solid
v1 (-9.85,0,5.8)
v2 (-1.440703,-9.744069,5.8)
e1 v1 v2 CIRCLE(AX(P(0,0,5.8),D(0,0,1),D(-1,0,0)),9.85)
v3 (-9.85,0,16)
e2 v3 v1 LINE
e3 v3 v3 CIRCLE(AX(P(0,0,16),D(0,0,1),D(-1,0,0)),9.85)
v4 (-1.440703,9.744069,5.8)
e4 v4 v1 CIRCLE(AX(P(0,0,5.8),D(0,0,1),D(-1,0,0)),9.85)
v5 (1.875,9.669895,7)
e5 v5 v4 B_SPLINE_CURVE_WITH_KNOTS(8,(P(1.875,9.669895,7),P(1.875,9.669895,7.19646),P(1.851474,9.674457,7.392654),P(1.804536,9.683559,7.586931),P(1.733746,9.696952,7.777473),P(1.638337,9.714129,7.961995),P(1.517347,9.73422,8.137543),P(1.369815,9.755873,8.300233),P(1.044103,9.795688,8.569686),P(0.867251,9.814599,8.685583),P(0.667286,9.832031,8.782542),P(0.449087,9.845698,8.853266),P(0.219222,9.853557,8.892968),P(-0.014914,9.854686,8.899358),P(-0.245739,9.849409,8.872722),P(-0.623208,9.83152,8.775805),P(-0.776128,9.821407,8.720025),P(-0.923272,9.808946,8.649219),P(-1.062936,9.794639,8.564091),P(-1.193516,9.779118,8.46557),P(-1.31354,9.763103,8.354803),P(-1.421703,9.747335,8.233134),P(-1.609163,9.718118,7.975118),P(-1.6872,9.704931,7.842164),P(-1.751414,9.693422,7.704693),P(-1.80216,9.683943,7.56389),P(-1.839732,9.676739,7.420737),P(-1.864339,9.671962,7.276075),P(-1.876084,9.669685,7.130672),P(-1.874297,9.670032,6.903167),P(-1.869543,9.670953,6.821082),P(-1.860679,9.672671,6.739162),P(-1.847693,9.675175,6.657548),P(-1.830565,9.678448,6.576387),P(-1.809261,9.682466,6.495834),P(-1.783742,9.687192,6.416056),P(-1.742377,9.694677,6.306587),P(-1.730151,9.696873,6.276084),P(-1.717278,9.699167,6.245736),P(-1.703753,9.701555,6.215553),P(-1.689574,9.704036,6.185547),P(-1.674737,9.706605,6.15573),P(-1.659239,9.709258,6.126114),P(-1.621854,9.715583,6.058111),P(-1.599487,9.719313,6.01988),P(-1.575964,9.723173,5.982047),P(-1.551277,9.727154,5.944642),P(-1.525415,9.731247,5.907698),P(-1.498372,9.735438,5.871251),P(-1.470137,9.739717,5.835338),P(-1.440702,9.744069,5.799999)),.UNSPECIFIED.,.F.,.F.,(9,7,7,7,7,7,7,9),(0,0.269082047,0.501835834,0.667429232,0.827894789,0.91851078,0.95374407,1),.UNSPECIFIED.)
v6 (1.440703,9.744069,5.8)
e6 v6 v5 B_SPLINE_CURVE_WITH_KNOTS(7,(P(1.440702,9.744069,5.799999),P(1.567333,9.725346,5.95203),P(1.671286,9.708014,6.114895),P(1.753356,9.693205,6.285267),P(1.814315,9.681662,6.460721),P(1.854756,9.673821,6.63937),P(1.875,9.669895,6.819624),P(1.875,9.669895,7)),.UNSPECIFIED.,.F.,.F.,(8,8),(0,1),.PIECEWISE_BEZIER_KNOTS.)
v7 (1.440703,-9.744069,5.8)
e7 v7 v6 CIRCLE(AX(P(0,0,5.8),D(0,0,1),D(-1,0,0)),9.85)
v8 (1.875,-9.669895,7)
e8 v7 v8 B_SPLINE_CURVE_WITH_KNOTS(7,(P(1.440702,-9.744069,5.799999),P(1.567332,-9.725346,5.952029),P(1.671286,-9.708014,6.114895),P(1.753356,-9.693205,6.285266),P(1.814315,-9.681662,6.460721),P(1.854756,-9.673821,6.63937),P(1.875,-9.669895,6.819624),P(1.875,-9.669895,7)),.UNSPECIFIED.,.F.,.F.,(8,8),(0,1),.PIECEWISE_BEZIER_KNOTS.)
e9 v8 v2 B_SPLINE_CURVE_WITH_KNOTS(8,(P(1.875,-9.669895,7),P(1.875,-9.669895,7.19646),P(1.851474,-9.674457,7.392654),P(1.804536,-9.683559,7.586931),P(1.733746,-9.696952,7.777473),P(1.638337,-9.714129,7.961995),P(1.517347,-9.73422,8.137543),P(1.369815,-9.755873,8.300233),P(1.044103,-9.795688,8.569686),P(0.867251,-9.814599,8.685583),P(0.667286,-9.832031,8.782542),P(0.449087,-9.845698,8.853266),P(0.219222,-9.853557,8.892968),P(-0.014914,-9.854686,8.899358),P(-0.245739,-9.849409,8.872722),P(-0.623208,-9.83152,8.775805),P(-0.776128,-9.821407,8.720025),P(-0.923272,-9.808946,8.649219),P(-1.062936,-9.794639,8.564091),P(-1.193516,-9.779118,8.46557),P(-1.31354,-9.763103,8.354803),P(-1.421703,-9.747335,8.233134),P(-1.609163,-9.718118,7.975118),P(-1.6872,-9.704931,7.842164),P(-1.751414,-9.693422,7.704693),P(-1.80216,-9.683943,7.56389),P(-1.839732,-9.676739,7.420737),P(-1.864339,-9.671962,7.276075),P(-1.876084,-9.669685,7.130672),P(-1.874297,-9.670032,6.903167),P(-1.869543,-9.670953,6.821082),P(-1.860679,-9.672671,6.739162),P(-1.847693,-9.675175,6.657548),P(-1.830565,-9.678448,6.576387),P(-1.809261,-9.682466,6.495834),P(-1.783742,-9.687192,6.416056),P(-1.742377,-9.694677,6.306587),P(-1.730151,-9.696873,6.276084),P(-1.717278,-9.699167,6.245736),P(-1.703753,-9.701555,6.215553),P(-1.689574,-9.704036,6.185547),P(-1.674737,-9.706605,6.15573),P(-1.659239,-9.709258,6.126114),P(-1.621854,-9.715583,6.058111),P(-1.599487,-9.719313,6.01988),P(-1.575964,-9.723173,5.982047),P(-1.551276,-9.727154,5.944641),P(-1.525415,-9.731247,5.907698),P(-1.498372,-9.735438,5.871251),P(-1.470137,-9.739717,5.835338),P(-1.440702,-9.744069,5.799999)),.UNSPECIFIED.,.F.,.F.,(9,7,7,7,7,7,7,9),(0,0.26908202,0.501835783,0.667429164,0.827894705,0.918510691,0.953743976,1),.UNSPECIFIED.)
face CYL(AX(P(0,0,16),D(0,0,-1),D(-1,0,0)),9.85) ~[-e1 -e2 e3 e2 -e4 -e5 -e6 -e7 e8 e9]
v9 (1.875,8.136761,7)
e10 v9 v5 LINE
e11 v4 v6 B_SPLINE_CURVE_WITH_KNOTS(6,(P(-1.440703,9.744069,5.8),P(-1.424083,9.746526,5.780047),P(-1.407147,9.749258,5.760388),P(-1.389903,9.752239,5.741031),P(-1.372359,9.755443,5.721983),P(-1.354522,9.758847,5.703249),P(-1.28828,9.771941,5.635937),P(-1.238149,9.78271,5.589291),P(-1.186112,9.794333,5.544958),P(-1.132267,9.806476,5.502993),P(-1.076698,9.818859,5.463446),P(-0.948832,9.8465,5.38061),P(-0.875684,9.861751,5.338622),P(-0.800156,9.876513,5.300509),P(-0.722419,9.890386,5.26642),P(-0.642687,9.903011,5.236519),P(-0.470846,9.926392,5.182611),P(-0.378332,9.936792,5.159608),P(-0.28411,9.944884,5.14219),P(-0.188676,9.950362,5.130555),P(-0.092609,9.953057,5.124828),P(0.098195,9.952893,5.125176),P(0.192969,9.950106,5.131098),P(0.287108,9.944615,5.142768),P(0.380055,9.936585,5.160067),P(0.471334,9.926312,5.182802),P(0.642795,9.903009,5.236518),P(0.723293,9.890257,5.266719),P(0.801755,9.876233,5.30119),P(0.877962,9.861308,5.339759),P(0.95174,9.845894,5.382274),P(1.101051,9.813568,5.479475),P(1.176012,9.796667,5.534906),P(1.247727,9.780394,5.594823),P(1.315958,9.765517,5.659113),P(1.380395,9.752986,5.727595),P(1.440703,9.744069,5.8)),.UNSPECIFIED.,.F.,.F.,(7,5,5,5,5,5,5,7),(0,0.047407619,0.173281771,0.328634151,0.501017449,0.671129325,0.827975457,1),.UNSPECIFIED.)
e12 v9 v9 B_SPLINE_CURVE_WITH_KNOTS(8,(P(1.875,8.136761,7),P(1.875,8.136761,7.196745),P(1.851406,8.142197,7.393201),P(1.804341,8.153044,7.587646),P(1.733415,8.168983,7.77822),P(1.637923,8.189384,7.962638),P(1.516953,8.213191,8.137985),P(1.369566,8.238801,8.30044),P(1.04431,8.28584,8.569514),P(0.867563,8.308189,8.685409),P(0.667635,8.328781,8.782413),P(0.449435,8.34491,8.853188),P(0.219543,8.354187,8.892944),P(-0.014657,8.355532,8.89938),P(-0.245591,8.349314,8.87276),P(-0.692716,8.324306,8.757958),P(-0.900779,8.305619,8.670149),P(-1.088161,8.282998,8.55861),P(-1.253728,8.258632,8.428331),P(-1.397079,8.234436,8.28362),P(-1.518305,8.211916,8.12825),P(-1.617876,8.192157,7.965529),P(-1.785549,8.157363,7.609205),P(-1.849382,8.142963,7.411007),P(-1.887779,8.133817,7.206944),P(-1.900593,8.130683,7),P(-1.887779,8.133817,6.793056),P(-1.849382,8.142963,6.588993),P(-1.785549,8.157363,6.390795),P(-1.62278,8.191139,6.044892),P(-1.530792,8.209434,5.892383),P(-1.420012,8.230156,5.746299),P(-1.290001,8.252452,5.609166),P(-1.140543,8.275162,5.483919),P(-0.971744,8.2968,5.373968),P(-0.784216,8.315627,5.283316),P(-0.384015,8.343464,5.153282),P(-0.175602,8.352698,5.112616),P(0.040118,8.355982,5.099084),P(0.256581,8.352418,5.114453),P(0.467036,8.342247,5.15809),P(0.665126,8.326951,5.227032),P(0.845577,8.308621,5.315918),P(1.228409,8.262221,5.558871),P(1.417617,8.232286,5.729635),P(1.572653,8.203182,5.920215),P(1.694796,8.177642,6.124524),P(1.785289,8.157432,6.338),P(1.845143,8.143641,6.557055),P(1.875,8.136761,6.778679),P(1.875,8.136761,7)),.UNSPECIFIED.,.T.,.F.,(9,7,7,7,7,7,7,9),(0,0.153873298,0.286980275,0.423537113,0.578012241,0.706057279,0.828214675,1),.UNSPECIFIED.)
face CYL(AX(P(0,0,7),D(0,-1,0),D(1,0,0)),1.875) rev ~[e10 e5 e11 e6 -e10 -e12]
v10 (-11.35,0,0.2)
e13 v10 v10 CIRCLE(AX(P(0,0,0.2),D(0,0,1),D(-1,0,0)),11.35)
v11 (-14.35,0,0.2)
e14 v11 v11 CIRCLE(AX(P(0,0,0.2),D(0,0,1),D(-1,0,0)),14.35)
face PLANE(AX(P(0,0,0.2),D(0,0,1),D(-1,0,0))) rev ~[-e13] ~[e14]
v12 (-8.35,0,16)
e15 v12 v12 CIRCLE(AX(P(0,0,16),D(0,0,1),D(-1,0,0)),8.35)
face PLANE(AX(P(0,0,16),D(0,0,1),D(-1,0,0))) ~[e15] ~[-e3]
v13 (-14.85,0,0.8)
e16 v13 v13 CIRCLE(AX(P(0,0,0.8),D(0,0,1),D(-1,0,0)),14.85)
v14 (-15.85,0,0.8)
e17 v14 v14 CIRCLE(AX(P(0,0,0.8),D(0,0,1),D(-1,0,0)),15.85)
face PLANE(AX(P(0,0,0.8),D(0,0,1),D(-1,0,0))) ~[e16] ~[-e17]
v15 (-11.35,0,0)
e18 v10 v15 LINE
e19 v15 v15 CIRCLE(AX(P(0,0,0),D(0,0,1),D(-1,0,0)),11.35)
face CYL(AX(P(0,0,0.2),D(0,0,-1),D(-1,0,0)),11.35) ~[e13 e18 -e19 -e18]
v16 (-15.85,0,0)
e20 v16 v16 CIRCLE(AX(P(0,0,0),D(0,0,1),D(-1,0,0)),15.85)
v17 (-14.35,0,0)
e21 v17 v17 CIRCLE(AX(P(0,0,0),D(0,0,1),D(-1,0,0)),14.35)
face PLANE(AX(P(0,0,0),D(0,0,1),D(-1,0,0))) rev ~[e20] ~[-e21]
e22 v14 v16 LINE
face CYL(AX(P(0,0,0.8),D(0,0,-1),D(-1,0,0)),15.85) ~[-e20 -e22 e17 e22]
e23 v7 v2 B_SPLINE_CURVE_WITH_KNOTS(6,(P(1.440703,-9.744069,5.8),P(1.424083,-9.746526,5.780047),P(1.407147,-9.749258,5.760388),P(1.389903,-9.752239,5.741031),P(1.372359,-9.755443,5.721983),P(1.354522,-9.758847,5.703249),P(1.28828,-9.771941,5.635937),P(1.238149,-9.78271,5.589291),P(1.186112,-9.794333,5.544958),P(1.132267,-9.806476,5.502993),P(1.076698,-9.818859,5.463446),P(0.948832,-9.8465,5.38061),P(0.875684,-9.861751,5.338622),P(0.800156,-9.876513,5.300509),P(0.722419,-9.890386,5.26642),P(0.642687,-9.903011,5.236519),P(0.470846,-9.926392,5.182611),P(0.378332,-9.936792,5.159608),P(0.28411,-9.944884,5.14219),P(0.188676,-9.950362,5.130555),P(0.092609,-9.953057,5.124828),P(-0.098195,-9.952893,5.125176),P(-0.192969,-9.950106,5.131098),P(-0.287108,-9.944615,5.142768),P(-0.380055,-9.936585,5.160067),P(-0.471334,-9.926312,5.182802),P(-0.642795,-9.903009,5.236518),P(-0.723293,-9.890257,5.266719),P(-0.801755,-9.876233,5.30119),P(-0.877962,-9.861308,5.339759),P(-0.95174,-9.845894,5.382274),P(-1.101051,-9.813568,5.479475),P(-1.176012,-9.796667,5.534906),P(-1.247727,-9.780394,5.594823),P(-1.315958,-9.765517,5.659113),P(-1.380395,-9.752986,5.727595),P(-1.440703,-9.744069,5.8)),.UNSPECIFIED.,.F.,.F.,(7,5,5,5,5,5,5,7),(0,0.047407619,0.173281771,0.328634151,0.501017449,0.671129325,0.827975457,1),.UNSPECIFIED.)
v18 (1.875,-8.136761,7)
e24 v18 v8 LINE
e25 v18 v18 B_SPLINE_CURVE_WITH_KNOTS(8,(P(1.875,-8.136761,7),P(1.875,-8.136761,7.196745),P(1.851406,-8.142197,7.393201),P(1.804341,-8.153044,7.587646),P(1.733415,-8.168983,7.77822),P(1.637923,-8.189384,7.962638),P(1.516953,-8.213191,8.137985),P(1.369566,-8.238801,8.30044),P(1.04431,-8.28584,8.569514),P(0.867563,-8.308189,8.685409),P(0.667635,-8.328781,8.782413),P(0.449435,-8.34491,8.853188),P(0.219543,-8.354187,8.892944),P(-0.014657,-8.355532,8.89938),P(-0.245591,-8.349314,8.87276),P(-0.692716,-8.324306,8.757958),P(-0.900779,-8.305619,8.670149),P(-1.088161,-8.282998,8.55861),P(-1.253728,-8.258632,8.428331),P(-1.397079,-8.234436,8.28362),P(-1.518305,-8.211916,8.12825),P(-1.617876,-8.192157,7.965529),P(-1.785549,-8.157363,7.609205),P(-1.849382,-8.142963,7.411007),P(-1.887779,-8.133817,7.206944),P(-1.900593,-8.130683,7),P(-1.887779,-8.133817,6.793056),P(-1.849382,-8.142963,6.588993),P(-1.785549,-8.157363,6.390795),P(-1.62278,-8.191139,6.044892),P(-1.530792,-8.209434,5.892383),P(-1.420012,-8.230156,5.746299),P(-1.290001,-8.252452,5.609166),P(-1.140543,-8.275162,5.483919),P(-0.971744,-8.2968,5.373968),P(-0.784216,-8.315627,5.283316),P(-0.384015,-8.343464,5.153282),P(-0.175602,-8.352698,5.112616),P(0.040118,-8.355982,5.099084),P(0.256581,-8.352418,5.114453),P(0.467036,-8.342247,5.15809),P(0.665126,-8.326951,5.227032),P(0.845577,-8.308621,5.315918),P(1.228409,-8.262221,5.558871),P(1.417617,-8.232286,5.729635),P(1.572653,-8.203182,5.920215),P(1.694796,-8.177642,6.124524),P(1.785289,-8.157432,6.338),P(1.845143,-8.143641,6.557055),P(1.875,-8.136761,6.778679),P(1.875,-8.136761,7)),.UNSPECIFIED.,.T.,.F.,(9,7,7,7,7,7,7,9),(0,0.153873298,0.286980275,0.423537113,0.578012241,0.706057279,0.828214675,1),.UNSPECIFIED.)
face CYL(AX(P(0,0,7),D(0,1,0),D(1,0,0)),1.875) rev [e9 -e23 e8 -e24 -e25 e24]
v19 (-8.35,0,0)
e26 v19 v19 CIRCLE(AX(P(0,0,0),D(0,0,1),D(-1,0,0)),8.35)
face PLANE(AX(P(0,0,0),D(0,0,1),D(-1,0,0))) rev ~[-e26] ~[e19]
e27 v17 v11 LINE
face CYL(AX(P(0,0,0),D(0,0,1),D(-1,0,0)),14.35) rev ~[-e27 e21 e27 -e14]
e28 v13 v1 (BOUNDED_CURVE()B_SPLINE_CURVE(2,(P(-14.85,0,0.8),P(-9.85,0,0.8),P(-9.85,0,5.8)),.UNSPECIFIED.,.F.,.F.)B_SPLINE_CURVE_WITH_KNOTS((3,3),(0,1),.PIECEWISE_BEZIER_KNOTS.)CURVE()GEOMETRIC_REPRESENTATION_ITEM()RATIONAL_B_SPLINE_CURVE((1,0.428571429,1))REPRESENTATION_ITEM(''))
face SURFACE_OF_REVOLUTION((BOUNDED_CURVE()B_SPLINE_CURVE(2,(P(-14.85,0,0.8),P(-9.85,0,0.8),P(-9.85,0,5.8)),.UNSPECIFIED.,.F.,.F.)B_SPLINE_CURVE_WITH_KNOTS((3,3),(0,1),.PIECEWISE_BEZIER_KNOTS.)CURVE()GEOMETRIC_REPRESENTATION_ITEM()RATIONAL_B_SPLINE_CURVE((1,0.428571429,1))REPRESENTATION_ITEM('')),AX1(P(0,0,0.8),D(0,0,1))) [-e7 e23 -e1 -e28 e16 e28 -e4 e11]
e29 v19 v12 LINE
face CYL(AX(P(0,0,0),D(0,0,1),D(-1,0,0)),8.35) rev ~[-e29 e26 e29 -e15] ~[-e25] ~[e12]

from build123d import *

# Parameters (mm, degrees)
F0_R          = 1.875
F3_DEPTH      = 15.851
F3_DEPTH_BACK = 15.851


# Not quite as in the source:
# - a fillet or chamfer that OpenCascade refuses, or shapes differently, is made with other operations: its cross-section is extruded or revolved along the edge and cut away or added


with BuildPart() as f1:
    # F0 (on Front) → F1 (revolve)
    with BuildSketch(Plane.XZ):
        Polygon((-15.85, 0.8), (-15.85, 0), (-14.35, 0), (-14.35, 0.2), (-11.35, 0.2), (-11.35, 0), (-8.35, 0), (-8.35, 16), (-9.85, 16), (-9.85, 0.8), align=None)
    revolve(axis=Axis((0, 0, 8), (0, 0, 1)))

    # F2: fillet of radius 5 on 1 edges, made by hand

    # F2_s1 → F2_t2 (revolve)
    with BuildSketch(Plane.XZ):
        with BuildLine():
            add(Edge.make_bspline(
                [(-14.85, 0.8), (-9.85, 0.8), (-9.85, 5.8)],
                knots=[0, 0, 0, 1, 1, 1], degree=2, weights=[1, 0.4285714286, 1]))
            Line((-9.85, 5.8), (-9.85, 0.8))
            Line((-9.85, 0.8), (-14.85, 0.8))
        make_face()
    revolve(axis=Axis((0, 0, 0.8), (0, 0, 1)))

    # F0 (on Front) → F3 (cut, two sides)
    with BuildSketch(Plane.XZ) as f3_sk:
        with Locations((0, 7)):
            Circle(F0_R)
    extrude(amount=-F3_DEPTH, mode=Mode.SUBTRACT)
    extrude(f3_sk.sketch, amount=F3_DEPTH_BACK, mode=Mode.SUBTRACT)


solid = f1.part
